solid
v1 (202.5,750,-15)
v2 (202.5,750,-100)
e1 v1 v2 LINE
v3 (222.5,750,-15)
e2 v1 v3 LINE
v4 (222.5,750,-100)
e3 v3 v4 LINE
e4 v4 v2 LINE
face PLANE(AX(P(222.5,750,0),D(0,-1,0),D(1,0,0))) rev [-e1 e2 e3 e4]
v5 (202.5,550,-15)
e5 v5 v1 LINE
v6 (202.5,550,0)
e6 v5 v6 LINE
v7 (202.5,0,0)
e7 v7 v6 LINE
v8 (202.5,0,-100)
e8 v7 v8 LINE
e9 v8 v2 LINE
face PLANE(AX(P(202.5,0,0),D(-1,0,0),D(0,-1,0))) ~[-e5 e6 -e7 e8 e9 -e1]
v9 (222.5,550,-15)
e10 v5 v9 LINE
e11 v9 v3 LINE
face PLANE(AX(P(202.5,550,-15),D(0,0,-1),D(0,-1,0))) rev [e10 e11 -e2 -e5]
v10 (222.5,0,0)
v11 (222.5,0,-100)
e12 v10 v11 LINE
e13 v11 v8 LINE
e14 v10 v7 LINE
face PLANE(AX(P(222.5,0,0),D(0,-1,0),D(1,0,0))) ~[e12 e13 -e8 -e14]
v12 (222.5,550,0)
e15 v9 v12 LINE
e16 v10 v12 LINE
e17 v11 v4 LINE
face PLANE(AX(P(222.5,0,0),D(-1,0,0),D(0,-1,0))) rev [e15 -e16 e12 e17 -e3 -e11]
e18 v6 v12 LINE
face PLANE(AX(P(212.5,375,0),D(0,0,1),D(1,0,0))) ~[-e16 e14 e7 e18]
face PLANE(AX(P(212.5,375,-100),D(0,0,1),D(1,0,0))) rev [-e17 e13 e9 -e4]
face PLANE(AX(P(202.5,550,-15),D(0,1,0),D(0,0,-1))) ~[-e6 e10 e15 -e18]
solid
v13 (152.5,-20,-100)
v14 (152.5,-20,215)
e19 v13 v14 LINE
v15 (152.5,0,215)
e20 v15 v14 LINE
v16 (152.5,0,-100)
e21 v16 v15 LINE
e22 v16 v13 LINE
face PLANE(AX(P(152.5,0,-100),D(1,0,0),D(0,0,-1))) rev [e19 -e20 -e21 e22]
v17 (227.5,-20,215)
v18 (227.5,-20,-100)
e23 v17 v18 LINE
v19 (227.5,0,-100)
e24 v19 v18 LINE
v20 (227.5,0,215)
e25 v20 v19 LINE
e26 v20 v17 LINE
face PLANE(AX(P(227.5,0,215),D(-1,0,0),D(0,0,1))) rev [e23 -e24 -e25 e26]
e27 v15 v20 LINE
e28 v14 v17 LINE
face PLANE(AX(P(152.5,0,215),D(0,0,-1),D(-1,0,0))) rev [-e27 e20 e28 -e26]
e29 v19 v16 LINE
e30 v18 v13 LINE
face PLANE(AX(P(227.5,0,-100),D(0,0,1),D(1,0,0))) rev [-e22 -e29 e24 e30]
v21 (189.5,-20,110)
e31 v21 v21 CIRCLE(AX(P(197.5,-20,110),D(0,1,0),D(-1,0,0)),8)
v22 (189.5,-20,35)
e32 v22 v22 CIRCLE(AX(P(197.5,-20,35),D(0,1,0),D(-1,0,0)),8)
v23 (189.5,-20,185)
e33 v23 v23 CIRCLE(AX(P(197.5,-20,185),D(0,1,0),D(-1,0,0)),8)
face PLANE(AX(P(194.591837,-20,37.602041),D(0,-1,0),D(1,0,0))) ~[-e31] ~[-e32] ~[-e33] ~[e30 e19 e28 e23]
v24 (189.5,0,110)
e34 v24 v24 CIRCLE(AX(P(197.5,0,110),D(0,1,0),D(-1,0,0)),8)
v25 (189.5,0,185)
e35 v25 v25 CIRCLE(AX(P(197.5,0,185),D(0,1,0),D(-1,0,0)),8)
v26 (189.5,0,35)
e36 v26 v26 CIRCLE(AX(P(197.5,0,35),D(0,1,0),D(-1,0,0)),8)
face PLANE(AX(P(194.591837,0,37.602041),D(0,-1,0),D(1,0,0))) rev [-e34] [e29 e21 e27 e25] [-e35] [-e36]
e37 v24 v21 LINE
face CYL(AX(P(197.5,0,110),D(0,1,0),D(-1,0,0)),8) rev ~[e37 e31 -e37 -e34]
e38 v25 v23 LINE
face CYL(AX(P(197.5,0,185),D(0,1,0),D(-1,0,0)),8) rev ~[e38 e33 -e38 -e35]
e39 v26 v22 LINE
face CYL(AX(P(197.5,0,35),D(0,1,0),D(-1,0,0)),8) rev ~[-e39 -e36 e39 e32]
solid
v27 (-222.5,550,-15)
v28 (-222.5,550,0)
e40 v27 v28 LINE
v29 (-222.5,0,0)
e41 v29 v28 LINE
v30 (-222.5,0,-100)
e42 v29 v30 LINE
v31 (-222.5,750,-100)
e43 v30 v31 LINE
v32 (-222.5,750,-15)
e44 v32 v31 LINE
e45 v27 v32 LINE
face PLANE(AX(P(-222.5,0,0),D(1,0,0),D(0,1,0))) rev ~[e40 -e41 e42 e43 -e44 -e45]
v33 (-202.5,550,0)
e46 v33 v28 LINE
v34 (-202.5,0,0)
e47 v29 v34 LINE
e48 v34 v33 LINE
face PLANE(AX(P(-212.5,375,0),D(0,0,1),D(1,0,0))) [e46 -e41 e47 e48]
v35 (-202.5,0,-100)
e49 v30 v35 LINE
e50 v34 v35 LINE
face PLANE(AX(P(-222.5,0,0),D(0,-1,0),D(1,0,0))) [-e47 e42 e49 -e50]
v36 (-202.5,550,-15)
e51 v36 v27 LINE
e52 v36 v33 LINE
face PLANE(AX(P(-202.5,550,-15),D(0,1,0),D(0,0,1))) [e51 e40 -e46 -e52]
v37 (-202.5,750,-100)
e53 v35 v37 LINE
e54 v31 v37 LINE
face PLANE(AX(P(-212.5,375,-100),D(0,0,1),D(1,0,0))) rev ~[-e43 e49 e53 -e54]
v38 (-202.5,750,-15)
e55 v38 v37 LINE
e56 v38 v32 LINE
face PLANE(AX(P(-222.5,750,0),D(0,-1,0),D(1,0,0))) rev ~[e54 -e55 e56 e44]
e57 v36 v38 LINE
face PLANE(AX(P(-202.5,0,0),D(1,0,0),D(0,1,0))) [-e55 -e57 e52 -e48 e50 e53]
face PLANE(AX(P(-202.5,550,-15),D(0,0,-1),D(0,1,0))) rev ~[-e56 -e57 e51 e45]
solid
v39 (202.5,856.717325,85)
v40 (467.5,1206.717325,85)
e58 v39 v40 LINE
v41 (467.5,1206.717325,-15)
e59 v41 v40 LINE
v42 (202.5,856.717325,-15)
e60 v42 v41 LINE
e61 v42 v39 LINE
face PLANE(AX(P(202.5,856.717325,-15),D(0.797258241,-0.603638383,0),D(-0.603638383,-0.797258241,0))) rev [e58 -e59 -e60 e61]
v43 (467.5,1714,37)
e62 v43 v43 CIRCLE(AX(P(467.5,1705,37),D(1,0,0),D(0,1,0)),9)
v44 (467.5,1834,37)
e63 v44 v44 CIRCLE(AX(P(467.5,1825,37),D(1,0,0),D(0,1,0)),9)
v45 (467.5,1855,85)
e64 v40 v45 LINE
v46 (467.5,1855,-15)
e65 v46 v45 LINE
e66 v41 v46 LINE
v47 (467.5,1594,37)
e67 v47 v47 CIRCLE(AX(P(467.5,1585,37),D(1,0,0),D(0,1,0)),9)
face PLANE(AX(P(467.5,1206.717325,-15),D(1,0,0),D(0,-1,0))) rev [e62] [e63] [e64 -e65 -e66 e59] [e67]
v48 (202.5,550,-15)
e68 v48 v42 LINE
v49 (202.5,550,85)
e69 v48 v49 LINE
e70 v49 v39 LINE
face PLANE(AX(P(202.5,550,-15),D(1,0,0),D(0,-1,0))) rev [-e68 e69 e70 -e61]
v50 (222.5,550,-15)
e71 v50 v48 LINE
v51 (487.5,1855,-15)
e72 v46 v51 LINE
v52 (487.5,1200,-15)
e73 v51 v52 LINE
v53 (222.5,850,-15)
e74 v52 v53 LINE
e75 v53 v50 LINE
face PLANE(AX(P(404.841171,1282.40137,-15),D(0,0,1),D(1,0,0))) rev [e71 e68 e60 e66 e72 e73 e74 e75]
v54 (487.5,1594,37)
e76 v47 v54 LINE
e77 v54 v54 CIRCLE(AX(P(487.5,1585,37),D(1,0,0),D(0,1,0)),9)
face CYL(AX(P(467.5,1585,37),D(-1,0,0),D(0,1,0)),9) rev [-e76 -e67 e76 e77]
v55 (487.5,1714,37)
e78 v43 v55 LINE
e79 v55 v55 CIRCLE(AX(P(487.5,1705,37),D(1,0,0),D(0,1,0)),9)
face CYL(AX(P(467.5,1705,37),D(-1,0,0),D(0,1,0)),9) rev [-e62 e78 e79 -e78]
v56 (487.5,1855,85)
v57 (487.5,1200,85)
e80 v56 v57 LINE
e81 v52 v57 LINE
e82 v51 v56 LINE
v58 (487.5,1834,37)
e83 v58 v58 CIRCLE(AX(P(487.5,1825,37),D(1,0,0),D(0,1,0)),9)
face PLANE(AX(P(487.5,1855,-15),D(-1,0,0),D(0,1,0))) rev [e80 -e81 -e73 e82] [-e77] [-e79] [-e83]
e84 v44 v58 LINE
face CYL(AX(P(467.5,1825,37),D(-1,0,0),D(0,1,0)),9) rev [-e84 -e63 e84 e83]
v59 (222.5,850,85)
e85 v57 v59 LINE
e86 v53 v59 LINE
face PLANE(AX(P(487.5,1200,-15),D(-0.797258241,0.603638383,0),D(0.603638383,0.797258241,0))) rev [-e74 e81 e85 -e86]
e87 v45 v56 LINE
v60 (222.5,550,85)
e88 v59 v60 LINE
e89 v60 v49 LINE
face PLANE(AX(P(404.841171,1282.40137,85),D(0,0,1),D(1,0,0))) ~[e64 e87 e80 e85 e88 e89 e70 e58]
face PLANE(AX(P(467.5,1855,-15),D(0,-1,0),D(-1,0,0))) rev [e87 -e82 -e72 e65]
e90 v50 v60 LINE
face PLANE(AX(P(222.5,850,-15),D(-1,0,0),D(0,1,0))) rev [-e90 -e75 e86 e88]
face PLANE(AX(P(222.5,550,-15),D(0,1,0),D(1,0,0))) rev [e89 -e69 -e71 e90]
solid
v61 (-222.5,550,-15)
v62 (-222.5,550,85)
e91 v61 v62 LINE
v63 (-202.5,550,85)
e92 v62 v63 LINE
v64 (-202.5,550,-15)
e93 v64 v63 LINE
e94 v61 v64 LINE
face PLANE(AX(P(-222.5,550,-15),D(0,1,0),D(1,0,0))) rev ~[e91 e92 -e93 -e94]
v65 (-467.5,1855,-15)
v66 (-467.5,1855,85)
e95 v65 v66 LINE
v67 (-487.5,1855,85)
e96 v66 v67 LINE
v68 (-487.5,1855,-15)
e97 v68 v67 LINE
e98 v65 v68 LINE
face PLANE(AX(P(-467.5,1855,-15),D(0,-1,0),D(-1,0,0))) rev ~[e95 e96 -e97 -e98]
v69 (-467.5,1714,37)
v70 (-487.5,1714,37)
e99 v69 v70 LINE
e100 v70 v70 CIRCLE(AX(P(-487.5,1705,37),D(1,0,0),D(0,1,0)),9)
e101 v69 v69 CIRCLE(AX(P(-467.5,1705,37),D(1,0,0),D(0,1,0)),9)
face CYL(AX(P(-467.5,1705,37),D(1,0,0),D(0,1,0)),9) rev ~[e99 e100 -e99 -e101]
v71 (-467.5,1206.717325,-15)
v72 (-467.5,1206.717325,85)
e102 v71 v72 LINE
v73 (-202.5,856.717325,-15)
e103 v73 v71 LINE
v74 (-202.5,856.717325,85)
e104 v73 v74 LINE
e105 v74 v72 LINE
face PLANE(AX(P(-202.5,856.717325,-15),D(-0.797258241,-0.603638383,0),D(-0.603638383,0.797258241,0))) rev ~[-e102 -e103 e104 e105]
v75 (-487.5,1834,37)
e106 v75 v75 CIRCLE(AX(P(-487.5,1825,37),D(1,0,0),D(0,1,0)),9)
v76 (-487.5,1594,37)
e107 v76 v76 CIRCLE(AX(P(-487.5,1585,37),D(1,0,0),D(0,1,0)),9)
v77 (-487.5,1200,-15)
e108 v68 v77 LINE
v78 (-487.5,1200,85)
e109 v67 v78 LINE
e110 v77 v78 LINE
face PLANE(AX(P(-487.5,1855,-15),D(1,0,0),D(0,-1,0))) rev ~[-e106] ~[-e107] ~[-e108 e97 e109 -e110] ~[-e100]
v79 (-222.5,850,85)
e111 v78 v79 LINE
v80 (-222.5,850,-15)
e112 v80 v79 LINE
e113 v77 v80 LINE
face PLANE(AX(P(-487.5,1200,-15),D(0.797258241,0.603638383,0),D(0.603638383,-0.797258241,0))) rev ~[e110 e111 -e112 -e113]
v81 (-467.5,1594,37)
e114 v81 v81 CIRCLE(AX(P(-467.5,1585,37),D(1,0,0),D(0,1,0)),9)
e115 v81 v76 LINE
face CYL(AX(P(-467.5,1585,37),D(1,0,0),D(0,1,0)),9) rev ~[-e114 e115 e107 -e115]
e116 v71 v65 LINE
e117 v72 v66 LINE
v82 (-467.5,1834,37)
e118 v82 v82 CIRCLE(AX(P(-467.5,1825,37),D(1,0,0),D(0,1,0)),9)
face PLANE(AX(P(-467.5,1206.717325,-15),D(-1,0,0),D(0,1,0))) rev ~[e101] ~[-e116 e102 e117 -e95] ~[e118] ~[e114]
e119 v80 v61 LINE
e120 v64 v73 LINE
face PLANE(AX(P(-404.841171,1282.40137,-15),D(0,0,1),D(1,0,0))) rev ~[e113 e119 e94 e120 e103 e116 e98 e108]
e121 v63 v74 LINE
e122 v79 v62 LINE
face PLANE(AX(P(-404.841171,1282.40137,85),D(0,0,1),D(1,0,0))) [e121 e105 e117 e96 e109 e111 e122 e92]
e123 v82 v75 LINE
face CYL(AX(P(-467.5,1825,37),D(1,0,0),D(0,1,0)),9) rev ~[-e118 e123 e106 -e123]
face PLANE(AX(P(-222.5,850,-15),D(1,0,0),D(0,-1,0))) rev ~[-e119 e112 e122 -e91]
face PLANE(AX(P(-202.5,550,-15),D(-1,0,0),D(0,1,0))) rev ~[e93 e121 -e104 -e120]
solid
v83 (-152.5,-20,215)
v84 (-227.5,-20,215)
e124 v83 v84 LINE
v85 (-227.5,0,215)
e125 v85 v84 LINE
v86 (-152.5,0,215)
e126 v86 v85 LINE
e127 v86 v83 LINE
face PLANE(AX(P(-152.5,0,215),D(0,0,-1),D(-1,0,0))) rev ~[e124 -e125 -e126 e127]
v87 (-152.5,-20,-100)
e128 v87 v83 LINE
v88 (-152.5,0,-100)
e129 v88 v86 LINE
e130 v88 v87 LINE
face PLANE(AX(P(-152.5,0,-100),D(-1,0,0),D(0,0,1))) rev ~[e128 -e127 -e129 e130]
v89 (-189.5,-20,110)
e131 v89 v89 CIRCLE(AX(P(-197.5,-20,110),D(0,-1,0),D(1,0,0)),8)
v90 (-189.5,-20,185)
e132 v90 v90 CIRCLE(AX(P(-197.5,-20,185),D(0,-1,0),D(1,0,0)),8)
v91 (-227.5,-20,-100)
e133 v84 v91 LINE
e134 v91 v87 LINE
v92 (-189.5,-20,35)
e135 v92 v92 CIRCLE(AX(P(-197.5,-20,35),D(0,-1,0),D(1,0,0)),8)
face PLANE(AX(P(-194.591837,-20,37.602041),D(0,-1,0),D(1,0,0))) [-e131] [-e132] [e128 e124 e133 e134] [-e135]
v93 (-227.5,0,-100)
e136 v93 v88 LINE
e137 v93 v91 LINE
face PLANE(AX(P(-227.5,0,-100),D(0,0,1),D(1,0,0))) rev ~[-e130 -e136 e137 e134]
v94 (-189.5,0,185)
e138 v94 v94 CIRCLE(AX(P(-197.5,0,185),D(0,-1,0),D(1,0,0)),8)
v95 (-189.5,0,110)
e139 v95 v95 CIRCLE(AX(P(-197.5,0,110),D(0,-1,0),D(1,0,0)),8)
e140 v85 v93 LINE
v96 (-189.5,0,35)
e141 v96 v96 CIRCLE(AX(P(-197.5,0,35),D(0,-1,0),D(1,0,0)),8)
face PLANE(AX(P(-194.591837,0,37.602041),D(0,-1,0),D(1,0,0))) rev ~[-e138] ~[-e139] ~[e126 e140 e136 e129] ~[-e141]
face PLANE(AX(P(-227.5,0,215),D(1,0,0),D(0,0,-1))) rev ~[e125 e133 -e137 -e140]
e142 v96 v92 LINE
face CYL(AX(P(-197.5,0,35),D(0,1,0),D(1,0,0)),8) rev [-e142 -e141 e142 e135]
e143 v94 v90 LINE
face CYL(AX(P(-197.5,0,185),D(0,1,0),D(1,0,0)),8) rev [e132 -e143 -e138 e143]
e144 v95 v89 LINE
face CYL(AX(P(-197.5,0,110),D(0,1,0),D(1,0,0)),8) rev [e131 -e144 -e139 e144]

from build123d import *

# Parameters (mm, degrees)
F0_W     = 20
F0_H     = 750
F1_DEPTH = 100
F2_W     = 200
F2_H     = 15
F3_DEPTH = 20.001
F4_W     = 20
F4_H     = 200
F5_DEPTH = 100
F6_R     = 9
F7_DEPTH = 20.001
F8_R     = 8
F8_W     = 20
F8_H     = 100
F9_DEPTH = 20


with BuildPart() as f1:
    # F0 (on Top) → F1 (new body)
    with BuildSketch(Plane.XY):
        with Locations((-212.5, 375)):
            Rectangle(F0_W, F0_H)
    extrude(amount=-F1_DEPTH)

    # F2 (on face) → F3 (cut, through all)
    with BuildSketch(Plane.YZ.offset(-202.5)):
        with Locations((650, -7.5)):
            Rectangle(F2_W, F2_H)
    extrude(amount=-F3_DEPTH, mode=Mode.SUBTRACT)


with BuildPart() as f5:
    # F4 (on face) → F5 (new body)
    with BuildSketch(Plane.XY.offset(-15)):
        Polygon((-222.5, 850), (-222.5, 750), (-202.5, 750), (-202.5, 856.7173249649), (-467.5, 1206.7173249649), (-467.5, 1855), (-487.5, 1855), (-487.5, 1200), align=None)
        with Locations((-212.5, 650)):
            Rectangle(F4_W, F4_H)
    extrude(amount=F5_DEPTH)

    # F6 (on face) → F7 (cut, through all)
    with BuildSketch(Plane.YZ.offset(-467.5)):
        with Locations((1585, 37)):
            Circle(F6_R)
        with Locations((1705, 37)):
            Circle(F6_R)
        with Locations((1825, 37)):
            Circle(F6_R)
    extrude(amount=-F7_DEPTH, mode=Mode.SUBTRACT)


with BuildPart() as f9:
    # F8 (on face) → F9 (new body)
    with BuildSketch(Plane.XZ):
        Polygon((-227.5, 215), (-227.5, -100), (-222.5, -100), (-222.5, 0), (-202.5, 0), (-202.5, -100), (-152.5, -100), (-152.5, 215), align=None)
        with Locations((-197.5, 35)):
            Circle(F8_R, mode=Mode.SUBTRACT)
        with Locations((-197.5, 110)):
            Circle(F8_R, mode=Mode.SUBTRACT)
        with Locations((-197.5, 185)):
            Circle(F8_R, mode=Mode.SUBTRACT)
        with Locations((-212.5, -50)):
            Rectangle(F8_W, F8_H)
    extrude(amount=F9_DEPTH)


with BuildPart() as f10_1:
    # F10: instance of F5
    add(f5.part.mirror(Plane.YZ))


with BuildPart() as f10_2:
    # F10: instance of F1
    add(f1.part.mirror(Plane.YZ))


with BuildPart() as f10_3:
    # F10: instance of F9
    add(f9.part.mirror(Plane.YZ))


solid = Compound([f1.part, f5.part, f9.part, f10_1.part, f10_2.part, f10_3.part])
